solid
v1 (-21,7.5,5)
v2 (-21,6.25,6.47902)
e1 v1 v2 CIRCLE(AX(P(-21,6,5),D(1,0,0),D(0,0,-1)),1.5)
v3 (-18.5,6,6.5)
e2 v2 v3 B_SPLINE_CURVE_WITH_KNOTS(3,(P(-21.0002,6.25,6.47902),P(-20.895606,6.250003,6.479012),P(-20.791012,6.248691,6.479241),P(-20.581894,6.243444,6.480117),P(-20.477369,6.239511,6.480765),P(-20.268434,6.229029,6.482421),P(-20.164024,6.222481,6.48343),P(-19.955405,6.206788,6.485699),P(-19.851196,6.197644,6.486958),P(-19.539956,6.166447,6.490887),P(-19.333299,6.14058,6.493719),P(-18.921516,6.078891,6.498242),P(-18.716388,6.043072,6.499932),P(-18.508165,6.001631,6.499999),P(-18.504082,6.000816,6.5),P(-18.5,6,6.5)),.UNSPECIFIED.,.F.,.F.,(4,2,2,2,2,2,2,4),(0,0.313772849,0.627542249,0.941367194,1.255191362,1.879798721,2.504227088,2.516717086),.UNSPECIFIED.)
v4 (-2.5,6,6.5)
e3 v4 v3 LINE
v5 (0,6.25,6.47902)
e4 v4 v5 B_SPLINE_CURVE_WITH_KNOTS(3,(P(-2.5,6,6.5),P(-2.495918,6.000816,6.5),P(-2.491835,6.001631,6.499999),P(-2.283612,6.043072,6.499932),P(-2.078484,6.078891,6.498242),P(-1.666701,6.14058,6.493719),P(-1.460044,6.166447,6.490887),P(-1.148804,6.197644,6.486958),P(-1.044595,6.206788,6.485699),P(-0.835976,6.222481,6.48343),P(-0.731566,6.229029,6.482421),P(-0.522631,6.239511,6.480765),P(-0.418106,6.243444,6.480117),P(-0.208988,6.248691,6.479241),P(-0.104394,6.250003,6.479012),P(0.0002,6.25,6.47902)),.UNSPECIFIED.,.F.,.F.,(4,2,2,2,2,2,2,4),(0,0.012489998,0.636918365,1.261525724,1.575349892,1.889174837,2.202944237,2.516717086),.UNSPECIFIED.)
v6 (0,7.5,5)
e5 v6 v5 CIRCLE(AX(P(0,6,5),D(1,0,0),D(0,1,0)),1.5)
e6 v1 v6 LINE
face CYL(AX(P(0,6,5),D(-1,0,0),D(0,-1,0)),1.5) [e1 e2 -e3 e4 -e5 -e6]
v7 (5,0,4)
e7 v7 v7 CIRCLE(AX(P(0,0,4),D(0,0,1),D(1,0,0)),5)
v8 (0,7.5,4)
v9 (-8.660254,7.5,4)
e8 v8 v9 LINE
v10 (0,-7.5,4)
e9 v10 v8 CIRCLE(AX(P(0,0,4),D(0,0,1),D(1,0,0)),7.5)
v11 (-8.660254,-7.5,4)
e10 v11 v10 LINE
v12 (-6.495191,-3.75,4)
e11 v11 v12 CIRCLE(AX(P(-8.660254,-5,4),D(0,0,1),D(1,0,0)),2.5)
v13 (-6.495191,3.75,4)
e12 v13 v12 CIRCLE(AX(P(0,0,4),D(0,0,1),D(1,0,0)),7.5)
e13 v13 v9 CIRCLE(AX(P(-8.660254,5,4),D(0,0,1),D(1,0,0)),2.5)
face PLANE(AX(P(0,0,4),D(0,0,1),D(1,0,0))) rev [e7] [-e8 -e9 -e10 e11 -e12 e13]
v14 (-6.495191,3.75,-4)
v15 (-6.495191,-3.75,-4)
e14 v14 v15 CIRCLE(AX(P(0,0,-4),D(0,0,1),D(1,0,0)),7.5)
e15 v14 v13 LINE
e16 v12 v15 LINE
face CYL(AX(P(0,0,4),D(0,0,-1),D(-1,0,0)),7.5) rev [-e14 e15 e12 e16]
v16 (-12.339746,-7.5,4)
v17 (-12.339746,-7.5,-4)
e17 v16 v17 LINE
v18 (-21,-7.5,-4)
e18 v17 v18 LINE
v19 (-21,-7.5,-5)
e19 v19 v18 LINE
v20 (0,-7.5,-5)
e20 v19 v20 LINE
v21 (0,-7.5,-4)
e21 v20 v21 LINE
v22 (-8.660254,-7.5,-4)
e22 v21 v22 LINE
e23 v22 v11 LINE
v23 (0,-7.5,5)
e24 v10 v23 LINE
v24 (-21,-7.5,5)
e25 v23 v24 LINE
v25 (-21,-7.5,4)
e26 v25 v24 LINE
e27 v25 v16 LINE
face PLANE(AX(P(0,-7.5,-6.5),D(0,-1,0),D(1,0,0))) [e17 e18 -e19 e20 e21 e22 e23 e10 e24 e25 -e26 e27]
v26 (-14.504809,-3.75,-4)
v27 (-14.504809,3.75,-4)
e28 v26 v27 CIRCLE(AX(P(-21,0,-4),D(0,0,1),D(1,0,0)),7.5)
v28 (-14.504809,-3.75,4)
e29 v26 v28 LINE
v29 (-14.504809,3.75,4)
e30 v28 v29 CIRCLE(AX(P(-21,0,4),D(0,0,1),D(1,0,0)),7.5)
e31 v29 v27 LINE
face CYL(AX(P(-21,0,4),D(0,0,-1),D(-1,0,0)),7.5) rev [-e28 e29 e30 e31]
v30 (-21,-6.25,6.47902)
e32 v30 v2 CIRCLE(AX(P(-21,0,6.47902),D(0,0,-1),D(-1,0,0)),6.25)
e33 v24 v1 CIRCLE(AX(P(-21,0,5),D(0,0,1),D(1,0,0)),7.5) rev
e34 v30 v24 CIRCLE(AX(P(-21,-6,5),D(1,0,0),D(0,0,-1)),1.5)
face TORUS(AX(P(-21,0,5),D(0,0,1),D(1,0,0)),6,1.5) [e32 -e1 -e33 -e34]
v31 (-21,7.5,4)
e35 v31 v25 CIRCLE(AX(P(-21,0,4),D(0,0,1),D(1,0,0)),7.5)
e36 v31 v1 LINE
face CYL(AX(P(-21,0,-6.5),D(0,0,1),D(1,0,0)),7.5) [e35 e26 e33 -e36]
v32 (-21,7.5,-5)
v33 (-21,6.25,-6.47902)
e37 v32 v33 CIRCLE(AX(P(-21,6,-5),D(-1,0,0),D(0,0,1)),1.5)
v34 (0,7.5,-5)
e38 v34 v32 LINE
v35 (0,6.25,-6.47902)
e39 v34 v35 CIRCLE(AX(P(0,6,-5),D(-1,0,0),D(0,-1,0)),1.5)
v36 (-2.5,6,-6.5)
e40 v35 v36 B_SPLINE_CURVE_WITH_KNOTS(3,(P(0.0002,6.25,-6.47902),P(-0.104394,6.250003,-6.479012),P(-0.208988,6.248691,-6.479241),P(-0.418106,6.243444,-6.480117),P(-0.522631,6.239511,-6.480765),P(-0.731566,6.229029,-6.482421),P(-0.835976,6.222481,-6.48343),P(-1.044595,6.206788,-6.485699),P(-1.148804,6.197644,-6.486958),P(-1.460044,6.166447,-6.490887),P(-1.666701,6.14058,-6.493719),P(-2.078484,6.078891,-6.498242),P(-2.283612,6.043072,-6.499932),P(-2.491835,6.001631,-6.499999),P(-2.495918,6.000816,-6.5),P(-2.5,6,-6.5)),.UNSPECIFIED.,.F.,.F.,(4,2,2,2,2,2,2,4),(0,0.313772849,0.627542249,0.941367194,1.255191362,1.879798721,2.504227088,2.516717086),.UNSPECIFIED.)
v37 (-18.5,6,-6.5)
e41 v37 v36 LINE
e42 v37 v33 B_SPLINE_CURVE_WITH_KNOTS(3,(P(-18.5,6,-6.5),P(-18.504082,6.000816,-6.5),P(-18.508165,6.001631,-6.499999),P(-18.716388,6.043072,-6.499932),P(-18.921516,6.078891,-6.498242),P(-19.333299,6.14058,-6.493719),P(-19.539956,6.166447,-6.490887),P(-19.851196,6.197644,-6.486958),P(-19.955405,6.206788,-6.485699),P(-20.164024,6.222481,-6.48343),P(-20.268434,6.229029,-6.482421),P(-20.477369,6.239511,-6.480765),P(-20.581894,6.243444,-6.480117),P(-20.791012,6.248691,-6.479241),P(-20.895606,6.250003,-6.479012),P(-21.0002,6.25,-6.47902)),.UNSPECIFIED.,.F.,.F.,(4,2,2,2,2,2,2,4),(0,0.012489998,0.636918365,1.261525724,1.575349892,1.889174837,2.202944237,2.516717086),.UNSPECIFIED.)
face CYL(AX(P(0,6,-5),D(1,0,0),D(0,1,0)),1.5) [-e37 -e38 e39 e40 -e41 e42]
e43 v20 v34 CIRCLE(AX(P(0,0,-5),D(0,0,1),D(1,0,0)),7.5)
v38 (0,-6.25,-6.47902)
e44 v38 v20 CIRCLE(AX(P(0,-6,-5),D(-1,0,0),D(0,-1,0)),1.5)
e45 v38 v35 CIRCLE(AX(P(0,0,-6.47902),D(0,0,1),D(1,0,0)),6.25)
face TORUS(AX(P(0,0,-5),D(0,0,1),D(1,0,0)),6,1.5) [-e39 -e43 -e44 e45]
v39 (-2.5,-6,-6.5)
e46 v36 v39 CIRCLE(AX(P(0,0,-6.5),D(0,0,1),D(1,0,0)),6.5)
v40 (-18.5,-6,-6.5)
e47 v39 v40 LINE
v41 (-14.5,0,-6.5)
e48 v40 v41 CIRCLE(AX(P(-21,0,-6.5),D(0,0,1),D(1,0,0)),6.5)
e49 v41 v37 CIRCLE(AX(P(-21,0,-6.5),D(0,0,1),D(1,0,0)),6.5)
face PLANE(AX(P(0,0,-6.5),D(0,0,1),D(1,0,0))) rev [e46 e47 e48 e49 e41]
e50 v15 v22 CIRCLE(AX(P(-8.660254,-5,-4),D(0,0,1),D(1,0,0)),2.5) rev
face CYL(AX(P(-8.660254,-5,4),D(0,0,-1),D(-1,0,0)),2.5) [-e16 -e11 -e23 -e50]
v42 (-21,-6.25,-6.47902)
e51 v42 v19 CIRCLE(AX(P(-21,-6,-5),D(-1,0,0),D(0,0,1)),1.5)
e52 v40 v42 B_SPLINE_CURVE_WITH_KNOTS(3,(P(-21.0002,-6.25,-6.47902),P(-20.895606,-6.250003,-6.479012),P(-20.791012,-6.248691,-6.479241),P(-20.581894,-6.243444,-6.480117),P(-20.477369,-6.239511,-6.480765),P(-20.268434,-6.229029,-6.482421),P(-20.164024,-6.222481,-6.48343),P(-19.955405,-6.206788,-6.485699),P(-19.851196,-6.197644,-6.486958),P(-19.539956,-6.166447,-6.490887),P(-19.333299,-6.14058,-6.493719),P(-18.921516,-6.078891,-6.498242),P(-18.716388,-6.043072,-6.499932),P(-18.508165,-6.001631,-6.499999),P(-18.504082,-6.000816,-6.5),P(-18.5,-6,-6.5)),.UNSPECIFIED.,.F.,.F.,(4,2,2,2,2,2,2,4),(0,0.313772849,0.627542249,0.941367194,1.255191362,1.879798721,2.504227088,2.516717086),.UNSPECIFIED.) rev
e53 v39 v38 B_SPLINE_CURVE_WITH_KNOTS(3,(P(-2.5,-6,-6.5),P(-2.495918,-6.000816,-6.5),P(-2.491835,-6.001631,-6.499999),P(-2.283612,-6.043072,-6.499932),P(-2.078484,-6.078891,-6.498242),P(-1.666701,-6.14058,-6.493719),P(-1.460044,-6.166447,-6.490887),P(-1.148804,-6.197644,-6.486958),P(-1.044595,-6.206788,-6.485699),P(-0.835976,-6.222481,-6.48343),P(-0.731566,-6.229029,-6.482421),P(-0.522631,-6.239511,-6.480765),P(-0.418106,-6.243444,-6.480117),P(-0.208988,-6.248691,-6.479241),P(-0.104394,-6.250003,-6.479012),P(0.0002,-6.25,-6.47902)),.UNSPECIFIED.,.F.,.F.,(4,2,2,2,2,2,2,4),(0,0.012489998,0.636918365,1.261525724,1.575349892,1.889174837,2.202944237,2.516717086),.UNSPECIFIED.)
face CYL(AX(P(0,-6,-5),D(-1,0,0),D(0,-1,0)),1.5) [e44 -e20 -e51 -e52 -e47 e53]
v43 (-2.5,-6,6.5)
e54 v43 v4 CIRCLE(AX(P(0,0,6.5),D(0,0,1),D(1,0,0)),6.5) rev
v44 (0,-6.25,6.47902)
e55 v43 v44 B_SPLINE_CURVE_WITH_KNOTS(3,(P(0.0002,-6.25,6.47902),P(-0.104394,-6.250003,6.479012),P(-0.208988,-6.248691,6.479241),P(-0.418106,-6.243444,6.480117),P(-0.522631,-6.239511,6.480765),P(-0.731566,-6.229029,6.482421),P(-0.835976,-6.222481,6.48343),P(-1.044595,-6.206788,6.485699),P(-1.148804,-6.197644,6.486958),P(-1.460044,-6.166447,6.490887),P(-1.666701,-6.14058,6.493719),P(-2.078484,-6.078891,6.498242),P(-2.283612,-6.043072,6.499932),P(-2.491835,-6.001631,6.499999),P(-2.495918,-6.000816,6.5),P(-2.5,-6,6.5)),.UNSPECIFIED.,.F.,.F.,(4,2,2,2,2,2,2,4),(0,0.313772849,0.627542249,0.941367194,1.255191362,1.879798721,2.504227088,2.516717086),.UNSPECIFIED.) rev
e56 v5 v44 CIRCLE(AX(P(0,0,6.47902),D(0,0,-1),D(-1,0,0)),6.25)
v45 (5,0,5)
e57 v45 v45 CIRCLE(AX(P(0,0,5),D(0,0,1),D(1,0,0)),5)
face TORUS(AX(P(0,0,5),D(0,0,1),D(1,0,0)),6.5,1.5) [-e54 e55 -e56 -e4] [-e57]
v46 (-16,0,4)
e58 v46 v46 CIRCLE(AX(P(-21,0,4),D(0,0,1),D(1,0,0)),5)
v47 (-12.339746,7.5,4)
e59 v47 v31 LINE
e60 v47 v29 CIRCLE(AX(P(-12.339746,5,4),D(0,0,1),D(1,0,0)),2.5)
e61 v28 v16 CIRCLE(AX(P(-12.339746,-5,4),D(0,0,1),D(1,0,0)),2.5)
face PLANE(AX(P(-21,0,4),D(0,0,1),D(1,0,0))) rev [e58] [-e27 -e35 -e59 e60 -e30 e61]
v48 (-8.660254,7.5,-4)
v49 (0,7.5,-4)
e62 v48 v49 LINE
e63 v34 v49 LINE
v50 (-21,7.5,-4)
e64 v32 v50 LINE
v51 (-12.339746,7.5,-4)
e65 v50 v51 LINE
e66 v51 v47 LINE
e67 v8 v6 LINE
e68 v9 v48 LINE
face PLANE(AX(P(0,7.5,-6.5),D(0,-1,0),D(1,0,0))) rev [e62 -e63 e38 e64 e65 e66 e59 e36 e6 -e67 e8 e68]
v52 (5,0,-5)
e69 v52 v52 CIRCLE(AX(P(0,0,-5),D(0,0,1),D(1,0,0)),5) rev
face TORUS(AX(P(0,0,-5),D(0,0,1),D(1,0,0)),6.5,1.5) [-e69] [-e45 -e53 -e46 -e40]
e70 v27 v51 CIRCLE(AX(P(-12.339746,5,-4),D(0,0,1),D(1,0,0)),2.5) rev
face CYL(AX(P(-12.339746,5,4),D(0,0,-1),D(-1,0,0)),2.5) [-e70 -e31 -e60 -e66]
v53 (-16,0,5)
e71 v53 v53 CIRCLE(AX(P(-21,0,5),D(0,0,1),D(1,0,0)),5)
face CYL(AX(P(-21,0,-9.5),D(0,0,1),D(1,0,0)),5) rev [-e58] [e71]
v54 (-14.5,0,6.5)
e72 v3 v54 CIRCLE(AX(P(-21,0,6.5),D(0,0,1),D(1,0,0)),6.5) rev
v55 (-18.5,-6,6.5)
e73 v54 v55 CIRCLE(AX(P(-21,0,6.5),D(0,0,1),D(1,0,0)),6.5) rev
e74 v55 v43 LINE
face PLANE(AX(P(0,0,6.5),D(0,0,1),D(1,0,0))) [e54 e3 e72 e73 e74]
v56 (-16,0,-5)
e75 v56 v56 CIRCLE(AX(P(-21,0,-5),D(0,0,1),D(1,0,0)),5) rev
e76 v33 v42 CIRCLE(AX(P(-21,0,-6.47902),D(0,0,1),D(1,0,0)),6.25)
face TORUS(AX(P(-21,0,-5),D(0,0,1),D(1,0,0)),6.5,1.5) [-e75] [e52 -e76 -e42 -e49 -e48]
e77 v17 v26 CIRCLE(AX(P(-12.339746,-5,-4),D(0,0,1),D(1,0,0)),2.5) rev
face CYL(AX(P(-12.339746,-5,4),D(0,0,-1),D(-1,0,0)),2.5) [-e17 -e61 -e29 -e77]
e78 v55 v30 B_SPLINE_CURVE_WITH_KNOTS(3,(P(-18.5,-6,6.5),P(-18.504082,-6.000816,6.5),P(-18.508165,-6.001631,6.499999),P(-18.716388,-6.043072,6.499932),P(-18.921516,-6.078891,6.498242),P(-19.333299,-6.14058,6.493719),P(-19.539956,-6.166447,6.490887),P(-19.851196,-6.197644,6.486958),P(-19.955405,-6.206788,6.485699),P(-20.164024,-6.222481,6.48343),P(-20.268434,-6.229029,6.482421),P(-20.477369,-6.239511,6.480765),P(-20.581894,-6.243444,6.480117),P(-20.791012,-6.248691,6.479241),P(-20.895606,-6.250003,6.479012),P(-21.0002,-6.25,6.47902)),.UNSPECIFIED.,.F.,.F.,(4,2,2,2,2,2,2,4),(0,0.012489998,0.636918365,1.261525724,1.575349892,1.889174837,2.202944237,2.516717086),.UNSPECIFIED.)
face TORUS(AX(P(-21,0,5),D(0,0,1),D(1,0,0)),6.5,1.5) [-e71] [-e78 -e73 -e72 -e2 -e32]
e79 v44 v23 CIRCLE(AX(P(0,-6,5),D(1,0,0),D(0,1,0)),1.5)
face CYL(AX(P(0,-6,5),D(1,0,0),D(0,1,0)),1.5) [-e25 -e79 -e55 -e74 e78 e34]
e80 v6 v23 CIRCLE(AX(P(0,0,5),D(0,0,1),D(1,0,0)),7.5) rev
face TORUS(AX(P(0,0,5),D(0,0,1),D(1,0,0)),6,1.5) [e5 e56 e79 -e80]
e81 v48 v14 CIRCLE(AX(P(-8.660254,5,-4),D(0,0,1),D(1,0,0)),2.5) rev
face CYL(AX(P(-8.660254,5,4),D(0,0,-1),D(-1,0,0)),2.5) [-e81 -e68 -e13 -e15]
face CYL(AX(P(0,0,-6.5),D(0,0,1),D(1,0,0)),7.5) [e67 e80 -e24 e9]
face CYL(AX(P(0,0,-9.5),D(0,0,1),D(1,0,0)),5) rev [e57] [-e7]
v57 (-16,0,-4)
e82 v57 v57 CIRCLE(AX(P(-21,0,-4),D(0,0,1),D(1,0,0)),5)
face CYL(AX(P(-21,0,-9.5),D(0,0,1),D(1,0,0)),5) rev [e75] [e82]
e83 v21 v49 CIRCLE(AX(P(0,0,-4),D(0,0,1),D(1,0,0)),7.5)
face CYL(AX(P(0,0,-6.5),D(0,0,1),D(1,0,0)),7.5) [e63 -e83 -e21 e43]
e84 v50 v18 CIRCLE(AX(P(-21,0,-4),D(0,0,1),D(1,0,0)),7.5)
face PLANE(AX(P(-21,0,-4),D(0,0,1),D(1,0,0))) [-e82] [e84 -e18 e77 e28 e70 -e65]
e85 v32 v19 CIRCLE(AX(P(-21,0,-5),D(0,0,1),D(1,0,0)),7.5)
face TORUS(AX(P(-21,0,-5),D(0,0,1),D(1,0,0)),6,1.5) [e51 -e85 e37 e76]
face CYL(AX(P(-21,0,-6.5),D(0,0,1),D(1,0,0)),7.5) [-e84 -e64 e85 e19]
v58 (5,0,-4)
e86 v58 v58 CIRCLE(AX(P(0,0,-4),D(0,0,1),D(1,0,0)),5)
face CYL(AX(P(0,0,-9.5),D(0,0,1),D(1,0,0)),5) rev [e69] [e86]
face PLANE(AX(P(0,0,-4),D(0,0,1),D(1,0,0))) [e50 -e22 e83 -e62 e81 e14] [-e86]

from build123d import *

# Parameters (mm, degrees)
BOSS_EXTRUDE2_DEPTH      = 6.5
BOSS_EXTRUDE2_DEPTH_BACK = 6.5
SKETCH1_R                = 7.5
CUT_EXTRUDE1_DEPTH       = 4
CUT_EXTRUDE1_DEPTH_BACK  = 4
SKETCH2_R                = 7.5
FILLET1_START            = -4
FILLET1_DEPTH            = 8
SKETCH3_R                = 5
CUT_EXTRUDE2_DEPTH       = 16
FILLET2_R                = 1.5


with BuildPart() as part:
    # Sketch1 → Boss-Extrude2 (new, two sides: drawn at the far end of the back side and taken through both)
    with BuildSketch(Plane.XY.offset(-BOSS_EXTRUDE2_DEPTH_BACK)):
        with Locations((-21, 0)):
            Circle(SKETCH1_R)
        with BuildLine():
            Line((0, 7.5), (-21, 7.5))
            ThreePointArc((-21, 7.5), (-15.696699141, 5.303300859), (-13.5, 0))
            ThreePointArc((-13.5, 0), (-15.696699141, -5.303300859), (-21, -7.5))
            Line((-21, -7.5), (0, -7.5))
            ThreePointArc((0, -7.5), (-7.5, 0), (0, 7.5))
        make_face()
        Circle(SKETCH1_R)
    extrude(amount=BOSS_EXTRUDE2_DEPTH + BOSS_EXTRUDE2_DEPTH_BACK)

    # Sketch2 → Cut-Extrude1 (cut, two sides: drawn at the far end of the back side and taken through both)
    with BuildSketch(Plane.XY.offset(-CUT_EXTRUDE1_DEPTH_BACK)):
        with Locations((-21, 0)):
            Circle(SKETCH2_R)
        Circle(SKETCH2_R)
    extrude(amount=CUT_EXTRUDE1_DEPTH + CUT_EXTRUDE1_DEPTH_BACK, mode=Mode.SUBTRACT)

    # Fillet1: read off the stored shape, not the designer's step
    # Fillet1 outline → Fillet1 (cut)
    with BuildSketch(Plane.XY.offset(FILLET1_START)):
        with BuildLine():
            ThreePointArc((0, -7.5), (-3.75, -6.495190528), (-6.495190528, -3.75))
            ThreePointArc((-6.495190528, -3.75), (-6.495190528, -6.25), (-8.660254038, -7.5))
            Line((-8.660254038, -7.5), (0, -7.5))
        make_face()
        with BuildLine():
            ThreePointArc((-8.660254038, 7.5), (-6.495190528, 6.25), (-6.495190528, 3.75))
            ThreePointArc((-6.495190528, 3.75), (-3.75, 6.495190528), (0, 7.5))
            Line((0, 7.5), (-8.660254038, 7.5))
        make_face()
        with BuildLine():
            Line((-21, -7.5), (-12.339745962, -7.5))
            ThreePointArc((-12.339745962, -7.5), (-14.504809472, -6.25), (-14.504809472, -3.75))
            ThreePointArc((-14.504809472, -3.75), (-17.25, -6.495190528), (-21, -7.5))
        make_face()
        with BuildLine():
            ThreePointArc((-14.504809472, 3.75), (-14.504809472, 6.25), (-12.339745962, 7.5))
            Line((-12.339745962, 7.5), (-21, 7.5))
            ThreePointArc((-21, 7.5), (-17.25, 6.495190528), (-14.504809472, 3.75))
        make_face()
    extrude(amount=FILLET1_DEPTH, mode=Mode.SUBTRACT)

    # Sketch3 → Cut-Extrude2 (cut)
    with BuildSketch(Plane.XY.offset(6.5)):
        with Locations((-21, 0)):
            Circle(SKETCH3_R)
        Circle(SKETCH3_R)
    extrude(amount=-CUT_EXTRUDE2_DEPTH, mode=Mode.SUBTRACT)

    # Fillet2
    # the kernel refuses this fillet: 1.5 mm, written as the material it takes off along each edge
    with BuildSketch(Plane(origin=(-21, 0, -6.5), x_dir=(1, 0, 0), z_dir=(0, -1, 0))) as fillet2_piece_1:
        with BuildLine():
            CenterArc((5 + FILLET2_R, FILLET2_R), FILLET2_R, 180, 90)
            Line((5, FILLET2_R), (5, 0))
            Line((5, 0), (5 + FILLET2_R, 0))
        make_face()
    revolve(axis=Axis((-21, 0, -6.5), (0, 0, 1)), mode=Mode.SUBTRACT)
    with BuildSketch(Plane(origin=(-21, 0, 6.5), x_dir=(1, 0, 0), z_dir=(0, -1, 0))) as fillet2_piece_2:
        with BuildLine():
            CenterArc((5 + FILLET2_R, -FILLET2_R), FILLET2_R, 90, 90)
            Line((5, -FILLET2_R), (5, 0))
            Line((5, 0), (5 + FILLET2_R, 0))
        make_face()
    revolve(axis=Axis((-21, 0, 6.5), (0, 0, 1)), mode=Mode.SUBTRACT)
    with BuildSketch(Plane(origin=(0, 0, -6.5), x_dir=(1, 0, 0), z_dir=(0, -1, 0))) as fillet2_piece_3:
        with BuildLine():
            CenterArc((5 + FILLET2_R, FILLET2_R), FILLET2_R, 180, 90)
            Line((5, FILLET2_R), (5, 0))
            Line((5, 0), (5 + FILLET2_R, 0))
        make_face()
    revolve(axis=Axis((0, 0, -6.5), (0, 0, 1)), mode=Mode.SUBTRACT)
    with BuildSketch(Plane(origin=(0, 0, 6.5), x_dir=(1, 0, 0), z_dir=(0, -1, 0))) as fillet2_piece_4:
        with BuildLine():
            CenterArc((5 + FILLET2_R, -FILLET2_R), FILLET2_R, 90, 90)
            Line((5, -FILLET2_R), (5, 0))
            Line((5, 0), (5 + FILLET2_R, 0))
        make_face()
    revolve(axis=Axis((0, 0, 6.5), (0, 0, 1)), mode=Mode.SUBTRACT)
    with BuildSketch(Plane(origin=(0, 7.5, 6.5), x_dir=(0, -1, 0), z_dir=(-1, 0, 0)), Plane(origin=(-21, -7.5, -6.5), x_dir=(0, 0, 1), z_dir=(1, 0, 0)), Plane(origin=(0, 7.5, -6.5), x_dir=(0, 0, 1), z_dir=(-1, 0, 0))) as fillet2_piece_5:
        with BuildLine():
            CenterArc((FILLET2_R, -FILLET2_R), FILLET2_R, 90, 90)
            Line((0, -FILLET2_R), (0, 0))
            Line((0, 0), (FILLET2_R, 0))
        make_face()
    extrude(amount=21, mode=Mode.SUBTRACT)
    with BuildSketch(Plane(origin=(-21, 0, 6.5), x_dir=(0, 1, 0), z_dir=(1, 0, 0))) as fillet2_piece_6:
        with BuildLine():
            CenterArc((7.5 - FILLET2_R, -FILLET2_R), FILLET2_R, 0, 90)
            Line((7.5, -FILLET2_R), (7.5, 0))
            Line((7.5, 0), (7.5 - FILLET2_R, 0))
        make_face()
    revolve(axis=Axis((-21, 0, 6.5), (0, 0, 1)), revolution_arc=180, mode=Mode.SUBTRACT)
    with BuildSketch(Plane(origin=(-21, -7.5, 6.5), x_dir=(0, 0, -1), z_dir=(1, 0, 0))) as fillet2_piece_7:
        with BuildLine():
            CenterArc((FILLET2_R, FILLET2_R), FILLET2_R, 180, 90)
            Line((0, FILLET2_R), (0, 0))
            Line((0, 0), (FILLET2_R, 0))
        make_face()
    extrude(amount=21, mode=Mode.SUBTRACT)
    with BuildSketch(Plane(origin=(0, 0, 6.5), x_dir=(0, 1, 0), z_dir=(-1, 0, 0))) as fillet2_piece_8:
        with BuildLine():
            CenterArc((7.5 - FILLET2_R, FILLET2_R), FILLET2_R, 270, 90)
            Line((7.5 - FILLET2_R, 0), (7.5, 0))
            Line((7.5, 0), (7.5, FILLET2_R))
        make_face()
    revolve(axis=Axis((0, 0, 6.5), (0, 0, -1)), revolution_arc=180, mode=Mode.SUBTRACT)
    with BuildSketch(Plane(origin=(0, 0, -6.5), x_dir=(0, -1, 0), z_dir=(-1, 0, 0))) as fillet2_piece_9:
        with BuildLine():
            CenterArc((7.5 - FILLET2_R, FILLET2_R), FILLET2_R, 270, 90)
            Line((7.5, FILLET2_R), (7.5, 0))
            Line((7.5, 0), (7.5 - FILLET2_R, 0))
        make_face()
    revolve(axis=Axis((0, 0, -6.5), (0, 0, 1)), revolution_arc=180, mode=Mode.SUBTRACT)
    with BuildSketch(Plane(origin=(-21, 0, -6.5), x_dir=(0, 1, 0), z_dir=(1, 0, 0))) as fillet2_piece_10:
        with BuildLine():
            CenterArc((7.5 - FILLET2_R, FILLET2_R), FILLET2_R, 270, 90)
            Line((7.5 - FILLET2_R, 0), (7.5, 0))
            Line((7.5, 0), (7.5, FILLET2_R))
        make_face()
    revolve(axis=Axis((-21, 0, -6.5), (0, 0, 1)), revolution_arc=180, mode=Mode.SUBTRACT)


solid = part.part
